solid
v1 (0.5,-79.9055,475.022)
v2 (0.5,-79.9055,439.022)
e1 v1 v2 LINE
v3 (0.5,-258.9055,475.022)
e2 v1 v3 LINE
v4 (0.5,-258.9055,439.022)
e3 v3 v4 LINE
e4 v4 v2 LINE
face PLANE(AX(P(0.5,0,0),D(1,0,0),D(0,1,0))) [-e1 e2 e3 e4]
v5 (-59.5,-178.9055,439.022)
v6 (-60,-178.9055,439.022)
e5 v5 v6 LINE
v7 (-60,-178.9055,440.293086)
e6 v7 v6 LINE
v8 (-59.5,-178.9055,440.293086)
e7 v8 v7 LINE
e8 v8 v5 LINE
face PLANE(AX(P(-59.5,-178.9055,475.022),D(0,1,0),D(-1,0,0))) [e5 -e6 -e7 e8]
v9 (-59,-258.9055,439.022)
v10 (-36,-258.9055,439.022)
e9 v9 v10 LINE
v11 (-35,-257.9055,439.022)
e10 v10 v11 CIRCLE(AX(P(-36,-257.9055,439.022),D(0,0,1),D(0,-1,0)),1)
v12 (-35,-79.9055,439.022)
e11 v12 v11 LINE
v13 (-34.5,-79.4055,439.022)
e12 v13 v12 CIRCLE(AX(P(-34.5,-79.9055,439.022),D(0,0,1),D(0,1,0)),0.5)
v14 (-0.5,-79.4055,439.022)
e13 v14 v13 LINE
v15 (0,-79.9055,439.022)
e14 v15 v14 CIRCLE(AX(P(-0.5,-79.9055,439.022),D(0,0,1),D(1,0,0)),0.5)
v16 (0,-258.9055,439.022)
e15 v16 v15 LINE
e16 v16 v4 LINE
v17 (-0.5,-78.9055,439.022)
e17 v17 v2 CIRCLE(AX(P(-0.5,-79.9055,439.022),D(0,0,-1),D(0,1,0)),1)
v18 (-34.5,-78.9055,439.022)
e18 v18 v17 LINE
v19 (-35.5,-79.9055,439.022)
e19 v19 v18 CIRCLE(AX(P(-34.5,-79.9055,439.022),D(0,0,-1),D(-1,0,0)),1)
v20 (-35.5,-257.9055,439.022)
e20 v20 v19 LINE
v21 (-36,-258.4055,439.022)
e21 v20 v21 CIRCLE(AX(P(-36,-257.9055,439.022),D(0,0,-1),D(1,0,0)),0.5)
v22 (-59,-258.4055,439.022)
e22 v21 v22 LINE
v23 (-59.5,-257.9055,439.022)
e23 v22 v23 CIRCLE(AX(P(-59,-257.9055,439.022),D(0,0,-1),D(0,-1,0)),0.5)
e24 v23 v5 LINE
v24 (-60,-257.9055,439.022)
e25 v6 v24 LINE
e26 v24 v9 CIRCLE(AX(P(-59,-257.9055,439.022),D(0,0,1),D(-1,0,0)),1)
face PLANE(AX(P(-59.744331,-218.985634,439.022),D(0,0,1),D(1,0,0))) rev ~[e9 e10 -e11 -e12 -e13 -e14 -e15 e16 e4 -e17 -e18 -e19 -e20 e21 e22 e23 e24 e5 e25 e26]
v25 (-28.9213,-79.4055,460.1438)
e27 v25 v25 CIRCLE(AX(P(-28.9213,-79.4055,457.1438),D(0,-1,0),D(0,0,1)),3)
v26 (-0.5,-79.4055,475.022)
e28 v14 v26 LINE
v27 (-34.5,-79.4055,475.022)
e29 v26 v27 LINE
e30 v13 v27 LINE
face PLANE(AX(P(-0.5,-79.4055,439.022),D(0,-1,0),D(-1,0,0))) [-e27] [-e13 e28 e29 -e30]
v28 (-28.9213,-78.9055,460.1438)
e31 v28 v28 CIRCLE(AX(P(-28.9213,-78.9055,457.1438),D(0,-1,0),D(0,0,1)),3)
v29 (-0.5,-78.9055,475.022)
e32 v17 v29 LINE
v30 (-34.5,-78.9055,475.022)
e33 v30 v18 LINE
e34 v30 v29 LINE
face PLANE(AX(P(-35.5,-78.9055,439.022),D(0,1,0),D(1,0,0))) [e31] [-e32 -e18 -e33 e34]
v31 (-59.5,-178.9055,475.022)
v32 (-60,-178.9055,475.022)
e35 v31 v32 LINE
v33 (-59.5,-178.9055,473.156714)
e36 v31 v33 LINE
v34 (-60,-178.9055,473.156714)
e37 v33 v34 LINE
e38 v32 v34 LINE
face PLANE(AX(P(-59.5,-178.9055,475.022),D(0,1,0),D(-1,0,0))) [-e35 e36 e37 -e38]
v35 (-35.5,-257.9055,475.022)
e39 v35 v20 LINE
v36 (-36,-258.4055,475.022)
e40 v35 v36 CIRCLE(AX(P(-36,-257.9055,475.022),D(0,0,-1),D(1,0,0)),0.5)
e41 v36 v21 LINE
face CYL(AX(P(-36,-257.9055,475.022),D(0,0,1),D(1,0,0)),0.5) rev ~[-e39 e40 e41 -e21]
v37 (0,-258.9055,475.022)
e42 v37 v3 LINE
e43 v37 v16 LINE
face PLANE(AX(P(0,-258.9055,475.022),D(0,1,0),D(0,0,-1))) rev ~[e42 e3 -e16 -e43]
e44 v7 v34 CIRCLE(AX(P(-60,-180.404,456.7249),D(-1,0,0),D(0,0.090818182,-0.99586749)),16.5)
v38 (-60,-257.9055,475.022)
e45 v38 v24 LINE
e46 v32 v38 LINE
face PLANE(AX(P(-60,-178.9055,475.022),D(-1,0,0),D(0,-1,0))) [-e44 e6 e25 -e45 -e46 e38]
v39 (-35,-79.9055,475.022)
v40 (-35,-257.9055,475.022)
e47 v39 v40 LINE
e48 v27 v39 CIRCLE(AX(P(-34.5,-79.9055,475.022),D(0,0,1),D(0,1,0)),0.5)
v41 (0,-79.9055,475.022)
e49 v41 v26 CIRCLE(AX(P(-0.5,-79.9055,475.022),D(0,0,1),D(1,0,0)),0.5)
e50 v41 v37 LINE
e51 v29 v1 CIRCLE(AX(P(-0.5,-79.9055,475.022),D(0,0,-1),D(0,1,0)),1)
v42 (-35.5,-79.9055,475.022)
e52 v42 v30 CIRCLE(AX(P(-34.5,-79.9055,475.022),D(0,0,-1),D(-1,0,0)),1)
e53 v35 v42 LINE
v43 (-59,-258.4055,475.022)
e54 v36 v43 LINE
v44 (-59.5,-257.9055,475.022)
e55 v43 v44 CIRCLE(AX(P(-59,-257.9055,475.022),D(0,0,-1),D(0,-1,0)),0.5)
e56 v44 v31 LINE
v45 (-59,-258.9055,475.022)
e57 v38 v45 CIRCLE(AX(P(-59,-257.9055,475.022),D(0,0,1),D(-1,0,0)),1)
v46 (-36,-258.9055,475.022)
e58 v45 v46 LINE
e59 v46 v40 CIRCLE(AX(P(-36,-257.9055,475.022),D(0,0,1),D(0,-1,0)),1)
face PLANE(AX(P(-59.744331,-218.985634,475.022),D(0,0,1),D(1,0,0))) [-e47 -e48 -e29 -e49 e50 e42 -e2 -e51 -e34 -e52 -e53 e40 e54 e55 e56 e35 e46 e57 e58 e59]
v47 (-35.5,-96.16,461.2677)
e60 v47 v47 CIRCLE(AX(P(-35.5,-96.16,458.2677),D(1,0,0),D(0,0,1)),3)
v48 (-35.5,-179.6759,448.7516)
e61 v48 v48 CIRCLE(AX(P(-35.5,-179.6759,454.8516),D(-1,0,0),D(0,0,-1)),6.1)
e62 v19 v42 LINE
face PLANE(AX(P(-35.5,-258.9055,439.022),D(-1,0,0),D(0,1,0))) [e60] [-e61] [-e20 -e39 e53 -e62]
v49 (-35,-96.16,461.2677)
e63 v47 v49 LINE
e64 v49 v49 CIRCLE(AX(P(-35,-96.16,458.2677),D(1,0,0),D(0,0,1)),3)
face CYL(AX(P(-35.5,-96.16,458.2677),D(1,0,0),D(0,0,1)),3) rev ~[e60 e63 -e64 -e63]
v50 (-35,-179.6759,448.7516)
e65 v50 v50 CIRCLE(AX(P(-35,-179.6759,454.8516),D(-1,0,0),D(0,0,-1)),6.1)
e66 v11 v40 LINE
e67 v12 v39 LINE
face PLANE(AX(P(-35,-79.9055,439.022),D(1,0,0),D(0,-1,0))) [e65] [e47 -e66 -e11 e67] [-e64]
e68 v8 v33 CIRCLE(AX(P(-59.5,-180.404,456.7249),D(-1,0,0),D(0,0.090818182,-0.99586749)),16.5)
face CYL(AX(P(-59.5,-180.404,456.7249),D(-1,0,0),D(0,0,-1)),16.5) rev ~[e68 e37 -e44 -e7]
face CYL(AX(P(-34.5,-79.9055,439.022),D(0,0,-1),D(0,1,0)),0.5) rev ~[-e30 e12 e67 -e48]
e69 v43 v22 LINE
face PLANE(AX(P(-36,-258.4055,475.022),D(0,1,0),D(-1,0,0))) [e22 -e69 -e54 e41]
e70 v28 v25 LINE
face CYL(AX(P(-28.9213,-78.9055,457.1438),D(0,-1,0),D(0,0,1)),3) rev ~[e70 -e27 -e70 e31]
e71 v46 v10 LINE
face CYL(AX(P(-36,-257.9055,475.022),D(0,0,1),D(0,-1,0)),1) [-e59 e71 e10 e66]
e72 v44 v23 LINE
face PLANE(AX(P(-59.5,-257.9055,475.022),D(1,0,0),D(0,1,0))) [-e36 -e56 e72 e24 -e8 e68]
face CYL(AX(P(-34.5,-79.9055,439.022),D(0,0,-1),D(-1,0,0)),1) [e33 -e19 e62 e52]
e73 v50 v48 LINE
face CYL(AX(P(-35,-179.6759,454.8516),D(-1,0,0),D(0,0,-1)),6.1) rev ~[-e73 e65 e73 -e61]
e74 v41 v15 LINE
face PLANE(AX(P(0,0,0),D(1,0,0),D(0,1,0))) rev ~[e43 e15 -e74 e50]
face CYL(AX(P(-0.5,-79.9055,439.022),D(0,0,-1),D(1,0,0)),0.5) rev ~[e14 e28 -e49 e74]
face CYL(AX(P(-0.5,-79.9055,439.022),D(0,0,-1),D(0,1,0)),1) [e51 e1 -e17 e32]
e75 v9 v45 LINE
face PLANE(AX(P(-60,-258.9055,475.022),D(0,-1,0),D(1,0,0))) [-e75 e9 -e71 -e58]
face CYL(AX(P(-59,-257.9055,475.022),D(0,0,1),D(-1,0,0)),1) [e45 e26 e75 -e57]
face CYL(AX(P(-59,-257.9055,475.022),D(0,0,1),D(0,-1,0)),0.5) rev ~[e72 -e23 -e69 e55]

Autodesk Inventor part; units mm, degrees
ref_plane "YZ Plane" through (0, 0, 0) normal (1, 0, 0) x (0, 1, 0)
ref_plane "XZ Plane" through (0, 0, 0) normal (0, 1, 0) x (-1, 0, 0)
ref_plane "XY Plane" through (0, 0, 0) normal (0, 0, 1) x (1, 0, 0)
sketch "Sketch1" plane through (0, 0, 0) normal (1, 0, 0) x (0, 1, 0)
  line L0 (-78.9055, 475.022) -> (-258.9055, 475.022)
  line L1 (-258.9055, 475.022) -> (-258.9055, 439.022)
  line L2 (-258.9055, 439.022) -> (-78.9055, 439.022)
  line L3 (-78.9055, 439.022) -> (-78.9055, 475.022)
  point P0 (0, 0)
  dimension "d0" = 180
  dimension "d1" = 36
extrude "Plate1" add sketch "Sketch1" along normal blind 0.5
sketch "Sketch2" plane through (0.5, -79.4055, 475.022) normal (0, 1, 0) x (1, 0, 0)
  line L0 (0, -36) -> (0, 0)
  line L1 (0, 0) -> (-36, 0)
  line L2 (-36, 0) -> (-36, -36)
  line L3 (-36, -36) -> (0, -36)
edge flange "Flange1" height 36 angle 90 thickness 0.5 bend radius 0.5 thickness toward (0, 1, 0) relief tear relief width 0.5 relief depth 0.25 edges at (0.5, -78.9055, 457.022) wall of the first edge with corners at (0.5, -79.4055, 439.022) (0.5, -79.4055, 475.022) (-35.5, -79.4055, 475.022) (-35.5, -79.4055, 439.022)
bend "Bend1"
corner "Corner1"
sketch "Sketch3" plane through (-35, -78.9055, 475.022) normal (-1, 0, 0) x (0, 1, 0)
  line L0 (0, -36) -> (0, 0)
  line L1 (0, 0) -> (-180, 0)
  line L2 (-180, 0) -> (-180, -36)
  line L3 (-180, -36) -> (0, -36)
edge flange "Flange2" height 180 angle 90 thickness 0.5 bend radius 0.5 thickness toward (-1, 0, 0) relief tear relief width 0.5 relief depth 0.25 edges at (-35.5, -78.9055, 457.022) wall of the first edge with corners at (-35, -78.9055, 439.022) (-35, -78.9055, 475.022) (-35, -258.9055, 475.022) (-35, -258.9055, 439.022)
bend "Bend2"
corner "Corner2"
sketch "Sketch4" plane through (-35, -258.4055, 439.022) normal (0, -1, 0) x (-1, 0, 0)
  line L0 (0, 36) -> (0, 0)
  line L1 (0, 0) -> (25, 0)
  line L2 (25, 0) -> (25, 36)
  line L3 (25, 36) -> (0, 36)
edge flange "Flange3" height 25 angle 90 thickness 0.5 bend radius 0.5 thickness toward (0, -1, 0) relief tear relief width 0.5 relief depth 0.25 edges at (-35, -258.9055, 457.022) wall of the first edge with corners at (-35, -258.4055, 475.022) (-35, -258.4055, 439.022) (-60, -258.4055, 439.022) (-60, -258.4055, 475.022)
bend "Bend3"
corner "Corner3"
sketch "Sketch5" plane through (-59.5, -258.9055, 475.022) normal (-1, 0, 0) x (0, -1, 0)
  line L0 (0, -36) -> (0, 0)
  line L1 (0, 0) -> (-80, 0)
  line L2 (-80, 0) -> (-80, -36)
  line L3 (-80, -36) -> (0, -36)
edge flange "Flange4" height 80 angle 90 thickness 0.5 bend radius 0.5 thickness toward (-1, 0, 0) relief tear relief width 0.5 relief depth 0.25 edges at (-60, -258.4055, 457.022) wall of the first edge with corners at (-59.5, -258.9055, 439.022) (-59.5, -258.9055, 475.022) (-59.5, -178.9055, 475.022) (-59.5, -178.9055, 439.022)
bend "Bend4"
corner "Corner4"
sketch "Sketch6" plane through (-59.5, -178.9055, 475.022) normal (1, 0, 0) x (0, 0, -1)
  point P0 (475.022, 178.9055)
  point P1 (18.2971, -1.4985)
hole "Hole1" at (-59.5, -180.404, 456.7249) direction (-1, 0, 0) diameter 33 depth 33 tip angle 118
sketch "Sketch7" plane through (-35, -79.9055, 475.022) normal (1, 0, 0) x (0, 0, -1)
  point P0 (475.022, 79.9055)
  point P1 (20.1704, -99.7704)
hole "Hole2" at (-35, -179.6759, 454.8516) direction (-1, 0, 0) diameter 12.2 depth 0.5 tip angle 118
sketch "Sketch8" plane through (-0.5, -78.9055, 475.022) normal (0, 1, 0) x (1, 0, 0)
  point P0 (0.5, 475.022)
  point P1 (-28.4213, 17.8782)
hole "Hole3" at (-28.9213, -78.9055, 457.1438) direction (0, -1, 0) diameter 6 depth 0.75 tip angle 118
sketch "Sketch9" plane through (-35.5, -79.9055, 439.022) normal (-1, 0, 0) x (0, 0, 1)
  point P0 (-439.022, 79.9055)
  point P1 (19.2457, -16.2545)
hole "Hole4" at (-35.5, -96.16, 458.2677) direction (1, 0, 0) diameter 6 depth 0.5 tip angle 118
equation "\"d55\" = Thickness"
equation "\"d69\" = Thickness"
equation "\"d2\" = Thickness"
equation "\"d3\" = BendReliefWidth"
equation "\"d4\" = BendReliefDepth"
equation "\"d5\" = MinimumRemnant"
equation "\"d6\" = TransitionRadius"
equation "\"d9\" = BendRadius"
equation "\"d10\" = CornerReliefSize"
equation "\"d11\" = GapSize"
equation "\"d12\" = JacobiRadiusSize"
equation "\"d13\" = BendReliefWidth"
equation "\"d14\" = BendReliefDepth"
equation "\"d15\" = MinimumRemnant"
equation "\"d16\" = TransitionRadius"
equation "\"d19\" = BendRadius"
equation "\"d20\" = CornerReliefSize"
equation "\"d21\" = GapSize"
equation "\"d22\" = JacobiRadiusSize"
equation "\"d23\" = BendReliefWidth"
equation "\"d24\" = BendReliefDepth"
equation "\"d25\" = MinimumRemnant"
equation "\"d26\" = TransitionRadius"
equation "\"d29\" = BendRadius"
equation "\"d30\" = CornerReliefSize"
equation "\"d31\" = GapSize"
equation "\"d32\" = JacobiRadiusSize"
equation "\"d33\" = BendReliefWidth"
equation "\"d34\" = BendReliefDepth"
equation "\"d35\" = MinimumRemnant"
equation "\"d36\" = TransitionRadius"
equation "\"d39\" = BendRadius"
equation "\"d40\" = CornerReliefSize"
equation "\"d41\" = GapSize"
equation "\"d42\" = JacobiRadiusSize"
equation "\"BendRadius\" = Thickness"
equation "\"BendReliefWidth\" = Thickness"
equation "\"BendReliefDepth\" = 0.5 * Thickness"
equation "\"CornerReliefSize\" = 4 * Thickness"
equation "\"MinimumRemnant\" = 2 * Thickness"
equation "\"TransitionRadius\" = BendRadius"
equation "\"JacobiRadiusSize\" = BendRadius"
equation "\"GapSize\" = Thickness"
equation "\"Thickness\" = 0.5"
properties part number "strikkkk"
